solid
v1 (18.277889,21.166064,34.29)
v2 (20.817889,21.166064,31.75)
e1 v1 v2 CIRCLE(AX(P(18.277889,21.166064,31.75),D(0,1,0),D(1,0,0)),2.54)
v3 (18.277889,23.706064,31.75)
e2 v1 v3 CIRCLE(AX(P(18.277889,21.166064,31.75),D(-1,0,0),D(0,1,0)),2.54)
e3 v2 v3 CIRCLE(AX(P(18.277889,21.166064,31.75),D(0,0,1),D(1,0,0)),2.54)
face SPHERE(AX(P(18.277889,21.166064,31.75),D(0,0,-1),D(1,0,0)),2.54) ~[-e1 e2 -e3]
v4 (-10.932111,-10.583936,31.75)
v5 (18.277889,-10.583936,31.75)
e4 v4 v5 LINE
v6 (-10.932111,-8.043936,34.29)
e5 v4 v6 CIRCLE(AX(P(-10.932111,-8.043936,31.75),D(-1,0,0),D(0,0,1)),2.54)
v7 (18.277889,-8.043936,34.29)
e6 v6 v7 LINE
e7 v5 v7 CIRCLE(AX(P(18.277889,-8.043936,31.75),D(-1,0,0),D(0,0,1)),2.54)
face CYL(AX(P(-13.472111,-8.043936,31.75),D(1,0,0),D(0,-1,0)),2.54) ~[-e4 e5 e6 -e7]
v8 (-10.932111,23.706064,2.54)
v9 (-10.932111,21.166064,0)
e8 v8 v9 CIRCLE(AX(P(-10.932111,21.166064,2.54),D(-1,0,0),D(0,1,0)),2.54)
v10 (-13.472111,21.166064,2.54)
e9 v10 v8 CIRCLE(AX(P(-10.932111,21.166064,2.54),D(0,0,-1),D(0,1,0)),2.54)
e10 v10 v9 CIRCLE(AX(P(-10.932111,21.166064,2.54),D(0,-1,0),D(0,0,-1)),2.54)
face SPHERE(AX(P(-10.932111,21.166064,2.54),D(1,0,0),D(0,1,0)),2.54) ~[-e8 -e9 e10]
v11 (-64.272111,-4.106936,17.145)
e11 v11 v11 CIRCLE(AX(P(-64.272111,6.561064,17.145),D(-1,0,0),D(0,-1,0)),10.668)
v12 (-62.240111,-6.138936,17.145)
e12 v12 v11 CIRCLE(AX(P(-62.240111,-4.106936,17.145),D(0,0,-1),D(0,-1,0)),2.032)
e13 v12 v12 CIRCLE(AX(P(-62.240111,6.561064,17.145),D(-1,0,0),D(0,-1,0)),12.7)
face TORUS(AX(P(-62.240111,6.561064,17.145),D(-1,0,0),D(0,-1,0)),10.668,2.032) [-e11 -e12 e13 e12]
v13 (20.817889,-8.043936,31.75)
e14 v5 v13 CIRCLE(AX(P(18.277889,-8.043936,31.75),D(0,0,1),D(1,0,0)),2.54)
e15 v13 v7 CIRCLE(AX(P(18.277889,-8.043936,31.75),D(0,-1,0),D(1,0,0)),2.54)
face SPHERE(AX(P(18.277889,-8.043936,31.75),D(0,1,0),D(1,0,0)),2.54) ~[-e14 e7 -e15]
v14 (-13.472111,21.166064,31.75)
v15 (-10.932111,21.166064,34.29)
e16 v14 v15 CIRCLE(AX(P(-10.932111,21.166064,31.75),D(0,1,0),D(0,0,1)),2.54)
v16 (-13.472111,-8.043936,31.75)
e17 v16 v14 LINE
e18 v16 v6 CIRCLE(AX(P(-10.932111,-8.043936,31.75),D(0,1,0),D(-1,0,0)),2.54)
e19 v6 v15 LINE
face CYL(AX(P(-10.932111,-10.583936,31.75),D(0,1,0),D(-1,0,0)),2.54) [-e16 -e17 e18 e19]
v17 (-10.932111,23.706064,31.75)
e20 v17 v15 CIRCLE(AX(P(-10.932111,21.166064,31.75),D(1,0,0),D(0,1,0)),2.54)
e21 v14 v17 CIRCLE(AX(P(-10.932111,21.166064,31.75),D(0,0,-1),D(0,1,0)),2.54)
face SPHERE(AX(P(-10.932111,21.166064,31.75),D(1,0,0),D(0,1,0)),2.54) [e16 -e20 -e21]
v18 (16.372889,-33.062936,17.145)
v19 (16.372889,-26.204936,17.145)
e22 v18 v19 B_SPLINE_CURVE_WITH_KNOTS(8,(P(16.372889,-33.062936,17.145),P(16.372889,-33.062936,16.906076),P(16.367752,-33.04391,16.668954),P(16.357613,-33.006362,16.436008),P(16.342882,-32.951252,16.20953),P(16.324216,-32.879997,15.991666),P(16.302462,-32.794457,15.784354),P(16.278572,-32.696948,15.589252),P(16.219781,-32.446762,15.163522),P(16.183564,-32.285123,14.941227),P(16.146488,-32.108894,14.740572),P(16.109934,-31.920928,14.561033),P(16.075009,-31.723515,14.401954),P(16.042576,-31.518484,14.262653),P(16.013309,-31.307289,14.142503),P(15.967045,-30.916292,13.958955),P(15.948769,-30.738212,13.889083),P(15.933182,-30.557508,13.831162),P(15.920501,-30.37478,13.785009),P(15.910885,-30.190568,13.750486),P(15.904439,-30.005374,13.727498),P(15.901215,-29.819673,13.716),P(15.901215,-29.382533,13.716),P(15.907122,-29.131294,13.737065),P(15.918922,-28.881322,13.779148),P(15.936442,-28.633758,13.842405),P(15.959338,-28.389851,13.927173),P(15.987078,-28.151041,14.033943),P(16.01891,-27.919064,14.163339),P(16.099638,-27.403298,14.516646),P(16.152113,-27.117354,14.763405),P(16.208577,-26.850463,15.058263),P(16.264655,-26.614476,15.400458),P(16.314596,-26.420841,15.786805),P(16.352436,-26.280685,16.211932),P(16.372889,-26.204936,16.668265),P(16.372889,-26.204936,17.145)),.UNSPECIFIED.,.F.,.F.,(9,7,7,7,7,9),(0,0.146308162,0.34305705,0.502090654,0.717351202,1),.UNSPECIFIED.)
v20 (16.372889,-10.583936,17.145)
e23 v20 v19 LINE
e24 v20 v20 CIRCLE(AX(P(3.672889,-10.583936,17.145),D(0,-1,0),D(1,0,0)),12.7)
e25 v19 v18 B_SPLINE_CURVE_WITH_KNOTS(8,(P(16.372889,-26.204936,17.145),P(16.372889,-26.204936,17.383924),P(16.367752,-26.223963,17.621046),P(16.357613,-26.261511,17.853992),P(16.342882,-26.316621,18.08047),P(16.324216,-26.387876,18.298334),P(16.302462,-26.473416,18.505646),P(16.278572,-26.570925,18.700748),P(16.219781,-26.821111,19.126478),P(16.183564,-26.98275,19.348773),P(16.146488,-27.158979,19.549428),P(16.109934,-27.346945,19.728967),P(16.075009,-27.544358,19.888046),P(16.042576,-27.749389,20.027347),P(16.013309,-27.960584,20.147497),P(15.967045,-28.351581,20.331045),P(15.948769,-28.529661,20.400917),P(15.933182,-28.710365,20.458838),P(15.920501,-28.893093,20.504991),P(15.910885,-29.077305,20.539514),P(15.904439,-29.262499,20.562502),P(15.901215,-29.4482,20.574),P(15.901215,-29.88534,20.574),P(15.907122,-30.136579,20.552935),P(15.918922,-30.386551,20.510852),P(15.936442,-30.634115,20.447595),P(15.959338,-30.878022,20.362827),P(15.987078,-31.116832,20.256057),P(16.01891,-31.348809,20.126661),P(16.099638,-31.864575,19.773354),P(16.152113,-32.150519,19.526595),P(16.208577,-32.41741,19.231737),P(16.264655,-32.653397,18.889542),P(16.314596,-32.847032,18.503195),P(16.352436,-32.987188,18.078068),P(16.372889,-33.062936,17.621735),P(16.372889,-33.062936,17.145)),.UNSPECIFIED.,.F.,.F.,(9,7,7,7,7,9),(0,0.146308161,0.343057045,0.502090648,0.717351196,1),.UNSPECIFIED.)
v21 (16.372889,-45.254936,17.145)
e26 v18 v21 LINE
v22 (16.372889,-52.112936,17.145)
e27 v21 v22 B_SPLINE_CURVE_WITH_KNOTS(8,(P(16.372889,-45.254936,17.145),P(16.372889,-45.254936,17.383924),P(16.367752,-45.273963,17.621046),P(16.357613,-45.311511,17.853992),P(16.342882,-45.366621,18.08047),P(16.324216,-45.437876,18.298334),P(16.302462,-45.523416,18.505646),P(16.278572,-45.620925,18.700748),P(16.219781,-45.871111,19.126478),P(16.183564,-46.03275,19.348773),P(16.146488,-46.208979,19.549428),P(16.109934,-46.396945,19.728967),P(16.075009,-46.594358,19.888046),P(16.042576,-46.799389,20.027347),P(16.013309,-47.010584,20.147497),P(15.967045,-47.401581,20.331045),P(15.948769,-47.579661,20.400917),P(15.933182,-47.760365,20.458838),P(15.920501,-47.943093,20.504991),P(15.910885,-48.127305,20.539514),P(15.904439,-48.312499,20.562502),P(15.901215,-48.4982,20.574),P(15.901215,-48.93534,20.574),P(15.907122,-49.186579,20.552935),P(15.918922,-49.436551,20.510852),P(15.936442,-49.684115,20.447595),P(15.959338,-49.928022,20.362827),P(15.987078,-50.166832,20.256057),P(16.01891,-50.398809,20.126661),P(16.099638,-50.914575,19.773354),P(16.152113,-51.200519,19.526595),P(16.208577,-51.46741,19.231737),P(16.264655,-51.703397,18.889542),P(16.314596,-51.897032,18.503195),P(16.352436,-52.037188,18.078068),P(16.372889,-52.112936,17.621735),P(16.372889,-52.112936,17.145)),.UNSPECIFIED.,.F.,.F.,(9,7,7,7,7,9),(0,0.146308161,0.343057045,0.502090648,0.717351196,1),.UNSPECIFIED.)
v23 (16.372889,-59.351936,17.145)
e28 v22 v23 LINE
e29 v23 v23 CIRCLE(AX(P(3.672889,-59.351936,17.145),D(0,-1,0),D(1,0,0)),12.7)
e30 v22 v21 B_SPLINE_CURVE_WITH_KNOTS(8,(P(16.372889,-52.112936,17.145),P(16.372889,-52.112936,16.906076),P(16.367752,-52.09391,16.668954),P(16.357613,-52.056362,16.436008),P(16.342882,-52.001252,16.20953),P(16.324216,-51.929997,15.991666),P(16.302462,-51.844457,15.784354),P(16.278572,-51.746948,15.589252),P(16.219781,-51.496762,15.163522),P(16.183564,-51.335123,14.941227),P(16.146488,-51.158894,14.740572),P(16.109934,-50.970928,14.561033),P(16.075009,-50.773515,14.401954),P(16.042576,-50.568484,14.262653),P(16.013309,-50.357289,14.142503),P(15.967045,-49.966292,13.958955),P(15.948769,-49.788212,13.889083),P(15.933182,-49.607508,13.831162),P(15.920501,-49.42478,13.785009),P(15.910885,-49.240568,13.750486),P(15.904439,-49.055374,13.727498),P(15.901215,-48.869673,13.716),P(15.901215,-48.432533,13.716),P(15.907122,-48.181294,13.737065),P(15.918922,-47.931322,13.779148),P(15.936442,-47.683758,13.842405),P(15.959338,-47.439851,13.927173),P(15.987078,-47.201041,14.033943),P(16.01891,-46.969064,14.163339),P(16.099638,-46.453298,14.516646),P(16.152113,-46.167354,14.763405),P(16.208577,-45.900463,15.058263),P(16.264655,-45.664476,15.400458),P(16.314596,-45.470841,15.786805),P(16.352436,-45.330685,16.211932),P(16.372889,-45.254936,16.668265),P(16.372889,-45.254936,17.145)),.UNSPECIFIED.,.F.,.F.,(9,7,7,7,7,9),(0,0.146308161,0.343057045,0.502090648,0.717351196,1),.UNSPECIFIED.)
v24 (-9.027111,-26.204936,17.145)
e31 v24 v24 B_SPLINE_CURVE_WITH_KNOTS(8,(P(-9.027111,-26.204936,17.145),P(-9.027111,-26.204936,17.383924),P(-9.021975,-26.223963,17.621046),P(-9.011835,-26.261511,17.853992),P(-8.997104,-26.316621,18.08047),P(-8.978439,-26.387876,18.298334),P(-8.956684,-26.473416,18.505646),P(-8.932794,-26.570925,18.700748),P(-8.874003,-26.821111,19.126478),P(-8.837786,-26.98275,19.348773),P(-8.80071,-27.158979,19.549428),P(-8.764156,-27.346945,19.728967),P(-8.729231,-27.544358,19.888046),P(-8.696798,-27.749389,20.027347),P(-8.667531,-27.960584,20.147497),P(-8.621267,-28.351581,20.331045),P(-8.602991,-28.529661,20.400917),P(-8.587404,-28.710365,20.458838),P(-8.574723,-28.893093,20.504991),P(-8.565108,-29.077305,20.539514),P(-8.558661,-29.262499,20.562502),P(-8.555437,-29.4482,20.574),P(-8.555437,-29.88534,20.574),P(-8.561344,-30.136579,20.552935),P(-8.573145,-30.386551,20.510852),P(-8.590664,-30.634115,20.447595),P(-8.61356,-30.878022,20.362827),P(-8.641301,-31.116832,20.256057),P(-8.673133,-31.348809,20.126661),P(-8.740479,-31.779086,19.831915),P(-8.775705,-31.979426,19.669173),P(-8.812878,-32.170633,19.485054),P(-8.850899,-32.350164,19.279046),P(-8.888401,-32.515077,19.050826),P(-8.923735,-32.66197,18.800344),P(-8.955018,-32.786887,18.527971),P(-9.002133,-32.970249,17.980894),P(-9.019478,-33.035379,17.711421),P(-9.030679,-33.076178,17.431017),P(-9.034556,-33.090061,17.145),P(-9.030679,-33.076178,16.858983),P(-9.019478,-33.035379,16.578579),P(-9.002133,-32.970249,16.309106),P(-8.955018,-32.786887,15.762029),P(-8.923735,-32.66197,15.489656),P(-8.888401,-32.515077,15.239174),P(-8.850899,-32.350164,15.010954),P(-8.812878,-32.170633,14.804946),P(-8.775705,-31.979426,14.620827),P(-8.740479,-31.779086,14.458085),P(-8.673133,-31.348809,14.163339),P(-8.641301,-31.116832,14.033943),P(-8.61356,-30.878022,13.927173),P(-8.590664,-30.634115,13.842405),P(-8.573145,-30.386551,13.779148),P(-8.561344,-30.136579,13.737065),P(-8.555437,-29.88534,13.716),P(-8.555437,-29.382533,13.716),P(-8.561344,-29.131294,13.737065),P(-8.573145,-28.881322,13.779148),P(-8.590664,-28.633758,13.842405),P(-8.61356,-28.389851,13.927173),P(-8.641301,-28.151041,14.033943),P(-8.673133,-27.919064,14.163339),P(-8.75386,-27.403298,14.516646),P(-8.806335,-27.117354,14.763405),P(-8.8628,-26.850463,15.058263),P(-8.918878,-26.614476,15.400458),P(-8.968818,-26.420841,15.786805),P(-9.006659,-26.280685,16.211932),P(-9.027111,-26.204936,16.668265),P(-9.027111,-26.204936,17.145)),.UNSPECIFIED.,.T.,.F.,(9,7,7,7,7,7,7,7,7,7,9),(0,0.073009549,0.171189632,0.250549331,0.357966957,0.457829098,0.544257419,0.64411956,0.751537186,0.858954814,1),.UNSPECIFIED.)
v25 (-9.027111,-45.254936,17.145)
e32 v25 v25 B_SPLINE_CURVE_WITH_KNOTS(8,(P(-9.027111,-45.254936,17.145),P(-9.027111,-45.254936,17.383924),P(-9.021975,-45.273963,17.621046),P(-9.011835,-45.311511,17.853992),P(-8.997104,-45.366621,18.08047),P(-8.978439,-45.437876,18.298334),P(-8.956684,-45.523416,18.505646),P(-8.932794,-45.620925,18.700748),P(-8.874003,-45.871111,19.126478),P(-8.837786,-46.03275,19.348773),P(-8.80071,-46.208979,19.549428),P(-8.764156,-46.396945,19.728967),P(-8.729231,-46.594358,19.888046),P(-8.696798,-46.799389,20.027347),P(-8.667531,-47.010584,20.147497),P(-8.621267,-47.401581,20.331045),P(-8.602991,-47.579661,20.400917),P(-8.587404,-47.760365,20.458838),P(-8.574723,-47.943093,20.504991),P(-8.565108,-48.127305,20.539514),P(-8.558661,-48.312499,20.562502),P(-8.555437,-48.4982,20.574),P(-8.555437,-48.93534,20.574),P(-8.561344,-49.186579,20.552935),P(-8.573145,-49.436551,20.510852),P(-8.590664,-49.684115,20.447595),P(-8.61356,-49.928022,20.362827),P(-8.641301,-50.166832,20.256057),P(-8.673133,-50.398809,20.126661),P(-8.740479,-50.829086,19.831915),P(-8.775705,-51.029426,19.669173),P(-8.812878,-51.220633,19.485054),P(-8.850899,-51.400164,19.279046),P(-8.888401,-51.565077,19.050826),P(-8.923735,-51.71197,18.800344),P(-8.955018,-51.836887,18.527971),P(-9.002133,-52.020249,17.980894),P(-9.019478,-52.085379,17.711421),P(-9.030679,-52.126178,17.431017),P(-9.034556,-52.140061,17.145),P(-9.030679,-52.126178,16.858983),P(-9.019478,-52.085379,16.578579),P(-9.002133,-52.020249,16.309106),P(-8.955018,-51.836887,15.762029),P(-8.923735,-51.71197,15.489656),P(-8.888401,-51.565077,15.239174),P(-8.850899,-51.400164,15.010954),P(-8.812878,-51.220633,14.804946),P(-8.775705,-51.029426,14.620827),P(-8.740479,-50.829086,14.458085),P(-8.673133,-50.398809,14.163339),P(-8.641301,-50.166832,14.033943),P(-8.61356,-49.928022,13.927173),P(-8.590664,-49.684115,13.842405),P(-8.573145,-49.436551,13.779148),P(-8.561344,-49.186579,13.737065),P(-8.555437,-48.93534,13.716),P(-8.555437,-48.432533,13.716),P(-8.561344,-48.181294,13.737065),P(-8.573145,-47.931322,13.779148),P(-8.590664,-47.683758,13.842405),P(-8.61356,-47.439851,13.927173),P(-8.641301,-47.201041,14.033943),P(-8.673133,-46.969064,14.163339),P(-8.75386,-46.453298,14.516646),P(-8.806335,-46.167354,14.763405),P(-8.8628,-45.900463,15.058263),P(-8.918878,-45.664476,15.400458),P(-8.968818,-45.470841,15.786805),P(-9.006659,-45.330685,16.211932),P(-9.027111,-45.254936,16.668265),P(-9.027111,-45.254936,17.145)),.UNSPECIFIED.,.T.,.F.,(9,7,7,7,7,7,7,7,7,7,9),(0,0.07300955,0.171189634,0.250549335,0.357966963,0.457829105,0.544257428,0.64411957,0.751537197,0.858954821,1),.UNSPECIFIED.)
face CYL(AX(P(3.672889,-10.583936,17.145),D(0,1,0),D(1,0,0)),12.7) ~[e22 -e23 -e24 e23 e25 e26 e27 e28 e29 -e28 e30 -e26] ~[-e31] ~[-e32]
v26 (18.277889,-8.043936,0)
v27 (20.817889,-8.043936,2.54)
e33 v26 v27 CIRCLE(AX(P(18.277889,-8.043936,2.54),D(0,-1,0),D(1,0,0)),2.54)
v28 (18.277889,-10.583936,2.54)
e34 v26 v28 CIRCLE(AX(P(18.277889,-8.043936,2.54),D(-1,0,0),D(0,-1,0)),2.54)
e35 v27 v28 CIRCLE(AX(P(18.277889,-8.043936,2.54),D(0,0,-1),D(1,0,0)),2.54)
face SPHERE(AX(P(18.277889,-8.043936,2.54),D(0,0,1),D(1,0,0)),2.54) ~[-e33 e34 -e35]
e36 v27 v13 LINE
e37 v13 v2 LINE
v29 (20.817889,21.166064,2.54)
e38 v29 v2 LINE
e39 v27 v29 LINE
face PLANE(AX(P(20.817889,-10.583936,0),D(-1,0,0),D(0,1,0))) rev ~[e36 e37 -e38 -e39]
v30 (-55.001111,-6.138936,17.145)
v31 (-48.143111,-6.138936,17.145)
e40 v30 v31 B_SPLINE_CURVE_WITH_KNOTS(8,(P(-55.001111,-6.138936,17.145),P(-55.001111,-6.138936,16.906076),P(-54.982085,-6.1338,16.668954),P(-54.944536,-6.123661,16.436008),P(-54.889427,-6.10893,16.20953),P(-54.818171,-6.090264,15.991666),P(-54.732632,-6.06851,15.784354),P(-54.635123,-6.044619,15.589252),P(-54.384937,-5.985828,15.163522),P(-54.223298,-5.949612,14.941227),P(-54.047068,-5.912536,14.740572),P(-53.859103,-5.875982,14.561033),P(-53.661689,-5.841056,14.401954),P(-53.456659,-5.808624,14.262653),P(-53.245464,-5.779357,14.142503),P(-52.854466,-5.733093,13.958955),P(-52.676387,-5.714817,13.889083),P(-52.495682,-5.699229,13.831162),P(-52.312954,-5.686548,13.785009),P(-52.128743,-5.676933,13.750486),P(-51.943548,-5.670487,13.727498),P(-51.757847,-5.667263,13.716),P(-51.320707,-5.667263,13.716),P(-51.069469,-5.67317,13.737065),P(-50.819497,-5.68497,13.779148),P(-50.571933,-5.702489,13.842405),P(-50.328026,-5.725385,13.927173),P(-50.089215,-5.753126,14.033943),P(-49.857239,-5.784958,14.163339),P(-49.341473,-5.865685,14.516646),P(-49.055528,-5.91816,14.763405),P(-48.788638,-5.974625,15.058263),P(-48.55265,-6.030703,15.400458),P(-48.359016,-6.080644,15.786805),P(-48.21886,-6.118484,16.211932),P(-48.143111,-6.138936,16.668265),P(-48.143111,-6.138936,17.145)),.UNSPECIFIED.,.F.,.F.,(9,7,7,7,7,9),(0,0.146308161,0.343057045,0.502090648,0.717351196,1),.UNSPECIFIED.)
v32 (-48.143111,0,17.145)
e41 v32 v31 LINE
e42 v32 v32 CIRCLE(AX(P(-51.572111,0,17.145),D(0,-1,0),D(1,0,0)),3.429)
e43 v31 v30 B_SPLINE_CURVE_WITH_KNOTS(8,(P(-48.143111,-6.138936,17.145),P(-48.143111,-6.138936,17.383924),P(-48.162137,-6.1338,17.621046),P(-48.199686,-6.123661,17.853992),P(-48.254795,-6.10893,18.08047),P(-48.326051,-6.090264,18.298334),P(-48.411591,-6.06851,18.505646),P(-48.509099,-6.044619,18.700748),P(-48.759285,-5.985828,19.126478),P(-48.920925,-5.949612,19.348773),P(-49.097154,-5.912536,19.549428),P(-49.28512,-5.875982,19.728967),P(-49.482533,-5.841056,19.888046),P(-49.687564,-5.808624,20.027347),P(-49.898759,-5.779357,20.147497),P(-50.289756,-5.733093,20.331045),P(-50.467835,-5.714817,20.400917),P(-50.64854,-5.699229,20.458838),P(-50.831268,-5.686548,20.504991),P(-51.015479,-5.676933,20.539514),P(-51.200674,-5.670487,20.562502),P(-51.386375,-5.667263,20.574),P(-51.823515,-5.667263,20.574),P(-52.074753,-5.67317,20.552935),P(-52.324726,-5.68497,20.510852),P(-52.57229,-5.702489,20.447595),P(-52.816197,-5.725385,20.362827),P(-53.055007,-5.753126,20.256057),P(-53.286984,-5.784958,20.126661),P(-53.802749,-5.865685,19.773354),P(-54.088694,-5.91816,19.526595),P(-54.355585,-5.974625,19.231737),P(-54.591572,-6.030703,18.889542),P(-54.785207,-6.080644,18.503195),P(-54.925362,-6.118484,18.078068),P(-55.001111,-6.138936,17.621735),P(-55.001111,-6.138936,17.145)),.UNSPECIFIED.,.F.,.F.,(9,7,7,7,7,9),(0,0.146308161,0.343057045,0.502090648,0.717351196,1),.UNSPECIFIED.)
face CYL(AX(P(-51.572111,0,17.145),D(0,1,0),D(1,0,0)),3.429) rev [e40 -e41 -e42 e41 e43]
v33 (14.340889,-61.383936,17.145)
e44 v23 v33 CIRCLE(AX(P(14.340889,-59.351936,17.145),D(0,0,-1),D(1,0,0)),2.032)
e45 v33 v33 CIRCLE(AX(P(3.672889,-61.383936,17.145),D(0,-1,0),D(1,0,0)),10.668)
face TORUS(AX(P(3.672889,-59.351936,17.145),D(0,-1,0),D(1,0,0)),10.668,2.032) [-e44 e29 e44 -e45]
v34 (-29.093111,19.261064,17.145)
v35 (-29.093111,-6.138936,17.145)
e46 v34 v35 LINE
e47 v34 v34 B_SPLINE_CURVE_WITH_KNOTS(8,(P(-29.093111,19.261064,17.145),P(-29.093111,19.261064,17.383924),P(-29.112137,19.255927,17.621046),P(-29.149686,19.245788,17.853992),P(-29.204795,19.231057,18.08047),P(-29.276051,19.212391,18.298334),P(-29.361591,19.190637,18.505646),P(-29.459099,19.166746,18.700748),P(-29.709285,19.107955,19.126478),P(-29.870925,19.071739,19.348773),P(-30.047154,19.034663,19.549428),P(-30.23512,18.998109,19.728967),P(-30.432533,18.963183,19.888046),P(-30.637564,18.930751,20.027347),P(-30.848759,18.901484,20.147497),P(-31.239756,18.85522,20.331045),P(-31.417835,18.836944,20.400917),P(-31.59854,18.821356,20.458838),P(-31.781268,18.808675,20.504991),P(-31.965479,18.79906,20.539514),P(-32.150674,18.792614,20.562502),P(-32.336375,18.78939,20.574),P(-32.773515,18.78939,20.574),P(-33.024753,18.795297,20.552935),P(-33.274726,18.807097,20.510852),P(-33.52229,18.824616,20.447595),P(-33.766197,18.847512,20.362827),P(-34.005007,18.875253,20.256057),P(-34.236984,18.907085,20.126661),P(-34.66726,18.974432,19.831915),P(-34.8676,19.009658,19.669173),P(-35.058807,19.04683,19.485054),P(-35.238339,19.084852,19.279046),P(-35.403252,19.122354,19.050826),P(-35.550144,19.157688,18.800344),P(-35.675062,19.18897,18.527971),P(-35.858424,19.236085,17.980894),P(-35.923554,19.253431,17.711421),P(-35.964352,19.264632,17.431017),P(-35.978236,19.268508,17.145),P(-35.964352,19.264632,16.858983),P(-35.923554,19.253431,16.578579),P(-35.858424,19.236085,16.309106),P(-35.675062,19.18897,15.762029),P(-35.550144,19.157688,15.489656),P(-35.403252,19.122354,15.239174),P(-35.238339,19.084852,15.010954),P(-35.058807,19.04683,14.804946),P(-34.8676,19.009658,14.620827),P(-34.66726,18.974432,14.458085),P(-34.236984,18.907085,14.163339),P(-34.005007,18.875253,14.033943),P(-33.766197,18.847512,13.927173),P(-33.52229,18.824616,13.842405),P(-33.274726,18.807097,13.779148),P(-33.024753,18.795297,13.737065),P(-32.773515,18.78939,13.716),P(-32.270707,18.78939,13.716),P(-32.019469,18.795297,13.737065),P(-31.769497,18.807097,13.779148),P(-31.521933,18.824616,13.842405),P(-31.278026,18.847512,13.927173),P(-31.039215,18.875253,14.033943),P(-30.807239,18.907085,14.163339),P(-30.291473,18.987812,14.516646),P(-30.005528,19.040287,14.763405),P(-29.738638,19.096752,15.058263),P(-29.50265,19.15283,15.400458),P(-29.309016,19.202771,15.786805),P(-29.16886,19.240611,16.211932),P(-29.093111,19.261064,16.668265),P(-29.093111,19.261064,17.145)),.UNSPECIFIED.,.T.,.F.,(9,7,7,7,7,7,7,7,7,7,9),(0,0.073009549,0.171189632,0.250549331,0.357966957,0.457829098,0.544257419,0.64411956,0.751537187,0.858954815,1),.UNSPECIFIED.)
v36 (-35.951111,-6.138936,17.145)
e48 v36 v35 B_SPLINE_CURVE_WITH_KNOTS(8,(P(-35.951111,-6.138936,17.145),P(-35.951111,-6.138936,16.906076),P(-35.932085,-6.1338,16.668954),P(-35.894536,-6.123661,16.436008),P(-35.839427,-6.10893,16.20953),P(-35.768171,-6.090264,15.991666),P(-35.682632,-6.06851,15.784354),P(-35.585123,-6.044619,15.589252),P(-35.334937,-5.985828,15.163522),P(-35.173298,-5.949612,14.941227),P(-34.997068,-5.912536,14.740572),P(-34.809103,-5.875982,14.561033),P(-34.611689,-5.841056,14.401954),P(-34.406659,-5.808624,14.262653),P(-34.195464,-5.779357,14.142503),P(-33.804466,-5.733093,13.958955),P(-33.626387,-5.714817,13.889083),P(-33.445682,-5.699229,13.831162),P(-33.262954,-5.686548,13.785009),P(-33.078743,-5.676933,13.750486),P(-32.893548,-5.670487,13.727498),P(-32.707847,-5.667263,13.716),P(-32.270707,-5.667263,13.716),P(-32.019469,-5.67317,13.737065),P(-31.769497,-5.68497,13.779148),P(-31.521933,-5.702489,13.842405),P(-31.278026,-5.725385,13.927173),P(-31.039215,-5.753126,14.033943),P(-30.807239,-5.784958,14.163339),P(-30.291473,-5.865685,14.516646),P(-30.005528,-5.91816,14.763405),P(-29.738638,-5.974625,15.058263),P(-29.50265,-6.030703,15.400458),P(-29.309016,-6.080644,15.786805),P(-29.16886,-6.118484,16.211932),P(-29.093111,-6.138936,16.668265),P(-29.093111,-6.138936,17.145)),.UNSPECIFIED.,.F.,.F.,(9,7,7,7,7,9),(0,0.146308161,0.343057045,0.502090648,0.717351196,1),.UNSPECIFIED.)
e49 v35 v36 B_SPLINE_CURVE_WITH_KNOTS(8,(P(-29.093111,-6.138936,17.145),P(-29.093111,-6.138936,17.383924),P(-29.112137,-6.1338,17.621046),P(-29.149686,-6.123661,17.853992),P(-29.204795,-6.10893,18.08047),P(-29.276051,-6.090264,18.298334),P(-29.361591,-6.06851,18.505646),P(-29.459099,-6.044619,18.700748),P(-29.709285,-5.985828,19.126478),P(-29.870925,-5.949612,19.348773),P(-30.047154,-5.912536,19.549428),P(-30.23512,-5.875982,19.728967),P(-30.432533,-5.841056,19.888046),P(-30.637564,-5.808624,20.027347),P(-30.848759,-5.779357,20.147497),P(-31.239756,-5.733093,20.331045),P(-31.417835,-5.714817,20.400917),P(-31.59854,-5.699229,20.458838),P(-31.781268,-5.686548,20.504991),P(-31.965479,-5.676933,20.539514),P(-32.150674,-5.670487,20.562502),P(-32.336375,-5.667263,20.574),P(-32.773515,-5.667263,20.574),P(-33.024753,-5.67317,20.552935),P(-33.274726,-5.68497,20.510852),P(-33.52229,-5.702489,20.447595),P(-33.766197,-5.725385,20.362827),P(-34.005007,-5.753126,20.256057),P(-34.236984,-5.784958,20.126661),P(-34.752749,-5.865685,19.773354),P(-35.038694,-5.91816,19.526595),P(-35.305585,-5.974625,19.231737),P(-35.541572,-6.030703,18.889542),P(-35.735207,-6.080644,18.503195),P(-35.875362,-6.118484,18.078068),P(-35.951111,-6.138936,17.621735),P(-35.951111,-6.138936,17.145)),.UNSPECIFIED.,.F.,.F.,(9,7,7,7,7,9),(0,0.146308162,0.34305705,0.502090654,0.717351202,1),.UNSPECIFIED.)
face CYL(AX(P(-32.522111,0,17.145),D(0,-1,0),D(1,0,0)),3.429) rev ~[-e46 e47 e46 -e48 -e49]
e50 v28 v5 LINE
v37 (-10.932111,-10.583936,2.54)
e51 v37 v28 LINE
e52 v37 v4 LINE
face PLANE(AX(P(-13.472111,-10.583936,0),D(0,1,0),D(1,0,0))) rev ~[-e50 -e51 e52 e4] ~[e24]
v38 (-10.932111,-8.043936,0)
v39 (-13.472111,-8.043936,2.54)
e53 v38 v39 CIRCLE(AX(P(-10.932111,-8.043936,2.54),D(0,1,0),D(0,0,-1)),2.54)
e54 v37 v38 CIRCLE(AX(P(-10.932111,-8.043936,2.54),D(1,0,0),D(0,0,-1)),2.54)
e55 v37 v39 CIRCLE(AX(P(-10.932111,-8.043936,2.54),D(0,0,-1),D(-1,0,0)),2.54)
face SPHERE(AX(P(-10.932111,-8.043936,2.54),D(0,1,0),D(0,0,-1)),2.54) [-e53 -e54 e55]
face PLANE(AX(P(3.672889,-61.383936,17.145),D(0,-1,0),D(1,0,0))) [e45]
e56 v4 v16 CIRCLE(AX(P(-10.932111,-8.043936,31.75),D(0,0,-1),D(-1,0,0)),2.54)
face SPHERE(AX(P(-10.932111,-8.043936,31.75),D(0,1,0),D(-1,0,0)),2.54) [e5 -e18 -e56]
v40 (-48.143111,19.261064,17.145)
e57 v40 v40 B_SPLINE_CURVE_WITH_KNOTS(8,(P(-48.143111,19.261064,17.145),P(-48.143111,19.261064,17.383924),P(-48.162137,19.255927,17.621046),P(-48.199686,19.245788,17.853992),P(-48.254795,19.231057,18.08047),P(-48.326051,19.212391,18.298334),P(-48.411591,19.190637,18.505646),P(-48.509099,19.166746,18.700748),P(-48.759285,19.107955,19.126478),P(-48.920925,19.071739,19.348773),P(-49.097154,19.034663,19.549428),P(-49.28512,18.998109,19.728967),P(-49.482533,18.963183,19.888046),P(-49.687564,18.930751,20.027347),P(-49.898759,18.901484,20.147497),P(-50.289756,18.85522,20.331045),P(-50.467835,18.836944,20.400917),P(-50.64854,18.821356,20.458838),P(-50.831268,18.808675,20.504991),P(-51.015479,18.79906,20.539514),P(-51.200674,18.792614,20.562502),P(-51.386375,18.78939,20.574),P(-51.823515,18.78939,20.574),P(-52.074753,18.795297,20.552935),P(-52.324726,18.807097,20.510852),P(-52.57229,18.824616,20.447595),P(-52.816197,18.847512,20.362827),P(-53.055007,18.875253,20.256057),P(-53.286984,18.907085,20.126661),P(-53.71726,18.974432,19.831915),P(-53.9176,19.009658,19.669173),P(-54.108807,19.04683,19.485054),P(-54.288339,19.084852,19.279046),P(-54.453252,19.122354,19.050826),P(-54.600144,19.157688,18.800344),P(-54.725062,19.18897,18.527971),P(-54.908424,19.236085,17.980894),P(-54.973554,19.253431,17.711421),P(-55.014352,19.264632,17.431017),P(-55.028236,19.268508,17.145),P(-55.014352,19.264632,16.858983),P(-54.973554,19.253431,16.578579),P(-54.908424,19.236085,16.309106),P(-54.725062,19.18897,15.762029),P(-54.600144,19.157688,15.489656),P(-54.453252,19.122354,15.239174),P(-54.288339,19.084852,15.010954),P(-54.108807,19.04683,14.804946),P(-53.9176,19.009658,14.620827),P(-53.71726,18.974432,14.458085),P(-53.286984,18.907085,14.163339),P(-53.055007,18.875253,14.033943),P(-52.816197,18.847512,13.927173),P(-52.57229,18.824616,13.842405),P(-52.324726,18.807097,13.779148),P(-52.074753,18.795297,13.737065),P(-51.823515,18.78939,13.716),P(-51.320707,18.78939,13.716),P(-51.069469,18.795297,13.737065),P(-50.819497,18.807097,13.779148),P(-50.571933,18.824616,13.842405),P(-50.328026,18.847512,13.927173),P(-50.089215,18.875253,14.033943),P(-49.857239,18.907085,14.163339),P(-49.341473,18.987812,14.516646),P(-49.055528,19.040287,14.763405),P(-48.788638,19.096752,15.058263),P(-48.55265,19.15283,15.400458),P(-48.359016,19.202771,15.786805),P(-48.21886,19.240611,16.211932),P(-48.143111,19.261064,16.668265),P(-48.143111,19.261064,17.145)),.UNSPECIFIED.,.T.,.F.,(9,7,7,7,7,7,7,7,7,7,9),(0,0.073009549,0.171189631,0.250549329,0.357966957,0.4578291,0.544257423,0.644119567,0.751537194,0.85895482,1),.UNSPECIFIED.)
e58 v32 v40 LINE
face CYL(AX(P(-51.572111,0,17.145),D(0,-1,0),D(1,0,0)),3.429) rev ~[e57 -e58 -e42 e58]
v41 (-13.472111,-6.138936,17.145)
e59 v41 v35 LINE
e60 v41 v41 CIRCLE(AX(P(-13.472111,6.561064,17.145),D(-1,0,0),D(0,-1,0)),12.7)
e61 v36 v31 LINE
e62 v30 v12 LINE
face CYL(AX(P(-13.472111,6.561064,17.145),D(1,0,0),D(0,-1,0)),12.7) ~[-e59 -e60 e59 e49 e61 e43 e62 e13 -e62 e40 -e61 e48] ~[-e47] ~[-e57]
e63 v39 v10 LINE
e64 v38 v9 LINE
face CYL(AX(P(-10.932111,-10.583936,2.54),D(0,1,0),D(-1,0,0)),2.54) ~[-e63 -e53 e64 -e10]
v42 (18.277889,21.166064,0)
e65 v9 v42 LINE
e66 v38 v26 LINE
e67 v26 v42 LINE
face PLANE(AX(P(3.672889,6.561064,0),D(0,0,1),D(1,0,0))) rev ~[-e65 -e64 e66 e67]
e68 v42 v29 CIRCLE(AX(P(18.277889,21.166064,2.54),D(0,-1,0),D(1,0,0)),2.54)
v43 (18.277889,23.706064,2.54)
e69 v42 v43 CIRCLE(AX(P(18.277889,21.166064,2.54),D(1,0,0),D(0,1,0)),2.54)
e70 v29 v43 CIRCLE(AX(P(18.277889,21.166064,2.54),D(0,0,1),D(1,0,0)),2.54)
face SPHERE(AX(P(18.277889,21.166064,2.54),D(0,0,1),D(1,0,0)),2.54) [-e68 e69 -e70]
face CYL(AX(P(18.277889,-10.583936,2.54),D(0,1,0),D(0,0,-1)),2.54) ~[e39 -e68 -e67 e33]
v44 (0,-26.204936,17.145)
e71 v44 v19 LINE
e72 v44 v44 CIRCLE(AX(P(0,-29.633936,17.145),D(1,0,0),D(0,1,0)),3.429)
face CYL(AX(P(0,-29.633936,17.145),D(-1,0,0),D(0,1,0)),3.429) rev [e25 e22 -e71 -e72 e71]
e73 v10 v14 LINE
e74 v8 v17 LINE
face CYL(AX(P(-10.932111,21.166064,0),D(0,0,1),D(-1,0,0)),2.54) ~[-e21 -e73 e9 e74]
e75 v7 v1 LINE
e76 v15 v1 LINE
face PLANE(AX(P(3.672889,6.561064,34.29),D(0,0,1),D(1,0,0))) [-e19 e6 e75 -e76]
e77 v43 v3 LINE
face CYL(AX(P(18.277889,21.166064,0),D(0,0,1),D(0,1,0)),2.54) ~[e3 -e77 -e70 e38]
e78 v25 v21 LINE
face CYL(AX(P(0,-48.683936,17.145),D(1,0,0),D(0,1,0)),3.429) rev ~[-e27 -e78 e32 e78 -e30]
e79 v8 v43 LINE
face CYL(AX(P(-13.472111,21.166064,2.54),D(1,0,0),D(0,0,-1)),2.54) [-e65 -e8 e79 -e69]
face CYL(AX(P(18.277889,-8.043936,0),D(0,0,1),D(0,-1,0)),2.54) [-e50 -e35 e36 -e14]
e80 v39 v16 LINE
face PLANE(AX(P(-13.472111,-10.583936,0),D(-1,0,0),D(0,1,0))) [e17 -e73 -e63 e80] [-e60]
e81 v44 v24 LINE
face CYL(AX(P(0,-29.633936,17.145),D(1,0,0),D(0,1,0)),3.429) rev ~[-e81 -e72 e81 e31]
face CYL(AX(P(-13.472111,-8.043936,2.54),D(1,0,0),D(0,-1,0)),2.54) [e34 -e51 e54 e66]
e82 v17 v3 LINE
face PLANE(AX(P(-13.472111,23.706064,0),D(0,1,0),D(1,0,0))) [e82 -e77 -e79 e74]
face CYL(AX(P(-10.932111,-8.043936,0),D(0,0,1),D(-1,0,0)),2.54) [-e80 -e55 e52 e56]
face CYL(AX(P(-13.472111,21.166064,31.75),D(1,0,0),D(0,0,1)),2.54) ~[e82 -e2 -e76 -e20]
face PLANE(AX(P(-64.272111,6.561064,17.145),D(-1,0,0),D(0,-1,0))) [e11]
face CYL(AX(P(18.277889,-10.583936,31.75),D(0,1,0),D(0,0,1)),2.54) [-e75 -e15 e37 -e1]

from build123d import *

# Parameters (mm, degrees)
F0_W      = 34.29
F0_H      = 34.29
F1_DEPTH  = 34.29
F2_R      = 12.7
F3_DEPTH  = 50.8
F4_R      = 12.7
F5_DEPTH  = 50.8
F6_R      = 3.429
F7_DEPTH  = 25.4
F8_R      = 3.429
F9_DEPTH  = 25.4
F10_R     = 3.429
F11_DEPTH = 25.4
F12_R     = 2.032
F13_R     = 2.54


with BuildPart() as f1:
    # F0 (on Top) → F1 (new body)
    with BuildSketch(Plane.XY):
        with Locations((3.6728888822, 6.5610635031)):
            Rectangle(F0_W, F0_H)
    extrude(amount=F1_DEPTH)

    # F2 (on face) → F3 (join)
    with BuildSketch(Plane(origin=(-13.4721111178, 0, 0), x_dir=(0, -1, 0), z_dir=(-1, 0, 0))):
        with Locations((-6.5610635031, 17.145)):
            Circle(F2_R)
    extrude(amount=F3_DEPTH)

    # F4 (on face) → F5 (join)
    with BuildSketch(Plane.XZ.offset(10.5839364969)):
        with Locations((3.6728888822, 17.145)):
            Circle(F4_R)
    extrude(amount=F5_DEPTH)

    # F6 (on Front) → F7 (cut, symmetric)
    with BuildSketch(Plane.XZ):
        with Locations((3.6728888822, 53.34)):
            Circle(F6_R)
        with Locations((3.6728888822, 72.39)):
            Circle(F6_R)
    extrude(amount=F7_DEPTH, both=True, mode=Mode.SUBTRACT)

    # F8 (on Right) → F9 (cut, symmetric)
    with BuildSketch(Plane.YZ):
        with Locations((-29.6339364969, 17.145)):
            Circle(F8_R)
        with Locations((-48.6839364969, 17.145)):
            Circle(F8_R)
    extrude(amount=F9_DEPTH, both=True, mode=Mode.SUBTRACT)

    # F10 (on Front) → F11 (cut, symmetric)
    with BuildSketch(Plane.XZ):
        with Locations((-51.5721111178, 17.145)):
            Circle(F10_R)
        with Locations((-32.5221111178, 17.145)):
            Circle(F10_R)
    extrude(amount=F11_DEPTH, both=True, mode=Mode.SUBTRACT)

    # F12
    f12_edges = [f1.edges().sort_by_distance(p)[0] for p in [
        (-9.027111, -61.383936, 17.145),
        (-64.272111, 19.261064, 17.145),
    ]]
    fillet(f12_edges, radius=F12_R)

    # F13
    f13_edges = [f1.edges().sort_by_distance(p)[0] for p in [
        (20.817889, 23.706064, 17.145),
        (20.817889, 6.561064, 34.29),
        (20.817889, -10.583936, 17.145),
        (20.817889, 6.561064, 0),
        (3.672889, 23.706064, 0),
        (3.672889, 23.706064, 34.29),
        (-13.472111, 23.706064, 17.145),
        (-13.472111, 6.561064, 0),
        (3.672889, -10.583936, 0),
        (-13.472111, 6.561064, 34.29),
        (-13.472111, -10.583936, 17.145),
        (3.672889, -10.583936, 34.29),
    ]]
    fillet(f13_edges, radius=F13_R)


solid = f1.part
